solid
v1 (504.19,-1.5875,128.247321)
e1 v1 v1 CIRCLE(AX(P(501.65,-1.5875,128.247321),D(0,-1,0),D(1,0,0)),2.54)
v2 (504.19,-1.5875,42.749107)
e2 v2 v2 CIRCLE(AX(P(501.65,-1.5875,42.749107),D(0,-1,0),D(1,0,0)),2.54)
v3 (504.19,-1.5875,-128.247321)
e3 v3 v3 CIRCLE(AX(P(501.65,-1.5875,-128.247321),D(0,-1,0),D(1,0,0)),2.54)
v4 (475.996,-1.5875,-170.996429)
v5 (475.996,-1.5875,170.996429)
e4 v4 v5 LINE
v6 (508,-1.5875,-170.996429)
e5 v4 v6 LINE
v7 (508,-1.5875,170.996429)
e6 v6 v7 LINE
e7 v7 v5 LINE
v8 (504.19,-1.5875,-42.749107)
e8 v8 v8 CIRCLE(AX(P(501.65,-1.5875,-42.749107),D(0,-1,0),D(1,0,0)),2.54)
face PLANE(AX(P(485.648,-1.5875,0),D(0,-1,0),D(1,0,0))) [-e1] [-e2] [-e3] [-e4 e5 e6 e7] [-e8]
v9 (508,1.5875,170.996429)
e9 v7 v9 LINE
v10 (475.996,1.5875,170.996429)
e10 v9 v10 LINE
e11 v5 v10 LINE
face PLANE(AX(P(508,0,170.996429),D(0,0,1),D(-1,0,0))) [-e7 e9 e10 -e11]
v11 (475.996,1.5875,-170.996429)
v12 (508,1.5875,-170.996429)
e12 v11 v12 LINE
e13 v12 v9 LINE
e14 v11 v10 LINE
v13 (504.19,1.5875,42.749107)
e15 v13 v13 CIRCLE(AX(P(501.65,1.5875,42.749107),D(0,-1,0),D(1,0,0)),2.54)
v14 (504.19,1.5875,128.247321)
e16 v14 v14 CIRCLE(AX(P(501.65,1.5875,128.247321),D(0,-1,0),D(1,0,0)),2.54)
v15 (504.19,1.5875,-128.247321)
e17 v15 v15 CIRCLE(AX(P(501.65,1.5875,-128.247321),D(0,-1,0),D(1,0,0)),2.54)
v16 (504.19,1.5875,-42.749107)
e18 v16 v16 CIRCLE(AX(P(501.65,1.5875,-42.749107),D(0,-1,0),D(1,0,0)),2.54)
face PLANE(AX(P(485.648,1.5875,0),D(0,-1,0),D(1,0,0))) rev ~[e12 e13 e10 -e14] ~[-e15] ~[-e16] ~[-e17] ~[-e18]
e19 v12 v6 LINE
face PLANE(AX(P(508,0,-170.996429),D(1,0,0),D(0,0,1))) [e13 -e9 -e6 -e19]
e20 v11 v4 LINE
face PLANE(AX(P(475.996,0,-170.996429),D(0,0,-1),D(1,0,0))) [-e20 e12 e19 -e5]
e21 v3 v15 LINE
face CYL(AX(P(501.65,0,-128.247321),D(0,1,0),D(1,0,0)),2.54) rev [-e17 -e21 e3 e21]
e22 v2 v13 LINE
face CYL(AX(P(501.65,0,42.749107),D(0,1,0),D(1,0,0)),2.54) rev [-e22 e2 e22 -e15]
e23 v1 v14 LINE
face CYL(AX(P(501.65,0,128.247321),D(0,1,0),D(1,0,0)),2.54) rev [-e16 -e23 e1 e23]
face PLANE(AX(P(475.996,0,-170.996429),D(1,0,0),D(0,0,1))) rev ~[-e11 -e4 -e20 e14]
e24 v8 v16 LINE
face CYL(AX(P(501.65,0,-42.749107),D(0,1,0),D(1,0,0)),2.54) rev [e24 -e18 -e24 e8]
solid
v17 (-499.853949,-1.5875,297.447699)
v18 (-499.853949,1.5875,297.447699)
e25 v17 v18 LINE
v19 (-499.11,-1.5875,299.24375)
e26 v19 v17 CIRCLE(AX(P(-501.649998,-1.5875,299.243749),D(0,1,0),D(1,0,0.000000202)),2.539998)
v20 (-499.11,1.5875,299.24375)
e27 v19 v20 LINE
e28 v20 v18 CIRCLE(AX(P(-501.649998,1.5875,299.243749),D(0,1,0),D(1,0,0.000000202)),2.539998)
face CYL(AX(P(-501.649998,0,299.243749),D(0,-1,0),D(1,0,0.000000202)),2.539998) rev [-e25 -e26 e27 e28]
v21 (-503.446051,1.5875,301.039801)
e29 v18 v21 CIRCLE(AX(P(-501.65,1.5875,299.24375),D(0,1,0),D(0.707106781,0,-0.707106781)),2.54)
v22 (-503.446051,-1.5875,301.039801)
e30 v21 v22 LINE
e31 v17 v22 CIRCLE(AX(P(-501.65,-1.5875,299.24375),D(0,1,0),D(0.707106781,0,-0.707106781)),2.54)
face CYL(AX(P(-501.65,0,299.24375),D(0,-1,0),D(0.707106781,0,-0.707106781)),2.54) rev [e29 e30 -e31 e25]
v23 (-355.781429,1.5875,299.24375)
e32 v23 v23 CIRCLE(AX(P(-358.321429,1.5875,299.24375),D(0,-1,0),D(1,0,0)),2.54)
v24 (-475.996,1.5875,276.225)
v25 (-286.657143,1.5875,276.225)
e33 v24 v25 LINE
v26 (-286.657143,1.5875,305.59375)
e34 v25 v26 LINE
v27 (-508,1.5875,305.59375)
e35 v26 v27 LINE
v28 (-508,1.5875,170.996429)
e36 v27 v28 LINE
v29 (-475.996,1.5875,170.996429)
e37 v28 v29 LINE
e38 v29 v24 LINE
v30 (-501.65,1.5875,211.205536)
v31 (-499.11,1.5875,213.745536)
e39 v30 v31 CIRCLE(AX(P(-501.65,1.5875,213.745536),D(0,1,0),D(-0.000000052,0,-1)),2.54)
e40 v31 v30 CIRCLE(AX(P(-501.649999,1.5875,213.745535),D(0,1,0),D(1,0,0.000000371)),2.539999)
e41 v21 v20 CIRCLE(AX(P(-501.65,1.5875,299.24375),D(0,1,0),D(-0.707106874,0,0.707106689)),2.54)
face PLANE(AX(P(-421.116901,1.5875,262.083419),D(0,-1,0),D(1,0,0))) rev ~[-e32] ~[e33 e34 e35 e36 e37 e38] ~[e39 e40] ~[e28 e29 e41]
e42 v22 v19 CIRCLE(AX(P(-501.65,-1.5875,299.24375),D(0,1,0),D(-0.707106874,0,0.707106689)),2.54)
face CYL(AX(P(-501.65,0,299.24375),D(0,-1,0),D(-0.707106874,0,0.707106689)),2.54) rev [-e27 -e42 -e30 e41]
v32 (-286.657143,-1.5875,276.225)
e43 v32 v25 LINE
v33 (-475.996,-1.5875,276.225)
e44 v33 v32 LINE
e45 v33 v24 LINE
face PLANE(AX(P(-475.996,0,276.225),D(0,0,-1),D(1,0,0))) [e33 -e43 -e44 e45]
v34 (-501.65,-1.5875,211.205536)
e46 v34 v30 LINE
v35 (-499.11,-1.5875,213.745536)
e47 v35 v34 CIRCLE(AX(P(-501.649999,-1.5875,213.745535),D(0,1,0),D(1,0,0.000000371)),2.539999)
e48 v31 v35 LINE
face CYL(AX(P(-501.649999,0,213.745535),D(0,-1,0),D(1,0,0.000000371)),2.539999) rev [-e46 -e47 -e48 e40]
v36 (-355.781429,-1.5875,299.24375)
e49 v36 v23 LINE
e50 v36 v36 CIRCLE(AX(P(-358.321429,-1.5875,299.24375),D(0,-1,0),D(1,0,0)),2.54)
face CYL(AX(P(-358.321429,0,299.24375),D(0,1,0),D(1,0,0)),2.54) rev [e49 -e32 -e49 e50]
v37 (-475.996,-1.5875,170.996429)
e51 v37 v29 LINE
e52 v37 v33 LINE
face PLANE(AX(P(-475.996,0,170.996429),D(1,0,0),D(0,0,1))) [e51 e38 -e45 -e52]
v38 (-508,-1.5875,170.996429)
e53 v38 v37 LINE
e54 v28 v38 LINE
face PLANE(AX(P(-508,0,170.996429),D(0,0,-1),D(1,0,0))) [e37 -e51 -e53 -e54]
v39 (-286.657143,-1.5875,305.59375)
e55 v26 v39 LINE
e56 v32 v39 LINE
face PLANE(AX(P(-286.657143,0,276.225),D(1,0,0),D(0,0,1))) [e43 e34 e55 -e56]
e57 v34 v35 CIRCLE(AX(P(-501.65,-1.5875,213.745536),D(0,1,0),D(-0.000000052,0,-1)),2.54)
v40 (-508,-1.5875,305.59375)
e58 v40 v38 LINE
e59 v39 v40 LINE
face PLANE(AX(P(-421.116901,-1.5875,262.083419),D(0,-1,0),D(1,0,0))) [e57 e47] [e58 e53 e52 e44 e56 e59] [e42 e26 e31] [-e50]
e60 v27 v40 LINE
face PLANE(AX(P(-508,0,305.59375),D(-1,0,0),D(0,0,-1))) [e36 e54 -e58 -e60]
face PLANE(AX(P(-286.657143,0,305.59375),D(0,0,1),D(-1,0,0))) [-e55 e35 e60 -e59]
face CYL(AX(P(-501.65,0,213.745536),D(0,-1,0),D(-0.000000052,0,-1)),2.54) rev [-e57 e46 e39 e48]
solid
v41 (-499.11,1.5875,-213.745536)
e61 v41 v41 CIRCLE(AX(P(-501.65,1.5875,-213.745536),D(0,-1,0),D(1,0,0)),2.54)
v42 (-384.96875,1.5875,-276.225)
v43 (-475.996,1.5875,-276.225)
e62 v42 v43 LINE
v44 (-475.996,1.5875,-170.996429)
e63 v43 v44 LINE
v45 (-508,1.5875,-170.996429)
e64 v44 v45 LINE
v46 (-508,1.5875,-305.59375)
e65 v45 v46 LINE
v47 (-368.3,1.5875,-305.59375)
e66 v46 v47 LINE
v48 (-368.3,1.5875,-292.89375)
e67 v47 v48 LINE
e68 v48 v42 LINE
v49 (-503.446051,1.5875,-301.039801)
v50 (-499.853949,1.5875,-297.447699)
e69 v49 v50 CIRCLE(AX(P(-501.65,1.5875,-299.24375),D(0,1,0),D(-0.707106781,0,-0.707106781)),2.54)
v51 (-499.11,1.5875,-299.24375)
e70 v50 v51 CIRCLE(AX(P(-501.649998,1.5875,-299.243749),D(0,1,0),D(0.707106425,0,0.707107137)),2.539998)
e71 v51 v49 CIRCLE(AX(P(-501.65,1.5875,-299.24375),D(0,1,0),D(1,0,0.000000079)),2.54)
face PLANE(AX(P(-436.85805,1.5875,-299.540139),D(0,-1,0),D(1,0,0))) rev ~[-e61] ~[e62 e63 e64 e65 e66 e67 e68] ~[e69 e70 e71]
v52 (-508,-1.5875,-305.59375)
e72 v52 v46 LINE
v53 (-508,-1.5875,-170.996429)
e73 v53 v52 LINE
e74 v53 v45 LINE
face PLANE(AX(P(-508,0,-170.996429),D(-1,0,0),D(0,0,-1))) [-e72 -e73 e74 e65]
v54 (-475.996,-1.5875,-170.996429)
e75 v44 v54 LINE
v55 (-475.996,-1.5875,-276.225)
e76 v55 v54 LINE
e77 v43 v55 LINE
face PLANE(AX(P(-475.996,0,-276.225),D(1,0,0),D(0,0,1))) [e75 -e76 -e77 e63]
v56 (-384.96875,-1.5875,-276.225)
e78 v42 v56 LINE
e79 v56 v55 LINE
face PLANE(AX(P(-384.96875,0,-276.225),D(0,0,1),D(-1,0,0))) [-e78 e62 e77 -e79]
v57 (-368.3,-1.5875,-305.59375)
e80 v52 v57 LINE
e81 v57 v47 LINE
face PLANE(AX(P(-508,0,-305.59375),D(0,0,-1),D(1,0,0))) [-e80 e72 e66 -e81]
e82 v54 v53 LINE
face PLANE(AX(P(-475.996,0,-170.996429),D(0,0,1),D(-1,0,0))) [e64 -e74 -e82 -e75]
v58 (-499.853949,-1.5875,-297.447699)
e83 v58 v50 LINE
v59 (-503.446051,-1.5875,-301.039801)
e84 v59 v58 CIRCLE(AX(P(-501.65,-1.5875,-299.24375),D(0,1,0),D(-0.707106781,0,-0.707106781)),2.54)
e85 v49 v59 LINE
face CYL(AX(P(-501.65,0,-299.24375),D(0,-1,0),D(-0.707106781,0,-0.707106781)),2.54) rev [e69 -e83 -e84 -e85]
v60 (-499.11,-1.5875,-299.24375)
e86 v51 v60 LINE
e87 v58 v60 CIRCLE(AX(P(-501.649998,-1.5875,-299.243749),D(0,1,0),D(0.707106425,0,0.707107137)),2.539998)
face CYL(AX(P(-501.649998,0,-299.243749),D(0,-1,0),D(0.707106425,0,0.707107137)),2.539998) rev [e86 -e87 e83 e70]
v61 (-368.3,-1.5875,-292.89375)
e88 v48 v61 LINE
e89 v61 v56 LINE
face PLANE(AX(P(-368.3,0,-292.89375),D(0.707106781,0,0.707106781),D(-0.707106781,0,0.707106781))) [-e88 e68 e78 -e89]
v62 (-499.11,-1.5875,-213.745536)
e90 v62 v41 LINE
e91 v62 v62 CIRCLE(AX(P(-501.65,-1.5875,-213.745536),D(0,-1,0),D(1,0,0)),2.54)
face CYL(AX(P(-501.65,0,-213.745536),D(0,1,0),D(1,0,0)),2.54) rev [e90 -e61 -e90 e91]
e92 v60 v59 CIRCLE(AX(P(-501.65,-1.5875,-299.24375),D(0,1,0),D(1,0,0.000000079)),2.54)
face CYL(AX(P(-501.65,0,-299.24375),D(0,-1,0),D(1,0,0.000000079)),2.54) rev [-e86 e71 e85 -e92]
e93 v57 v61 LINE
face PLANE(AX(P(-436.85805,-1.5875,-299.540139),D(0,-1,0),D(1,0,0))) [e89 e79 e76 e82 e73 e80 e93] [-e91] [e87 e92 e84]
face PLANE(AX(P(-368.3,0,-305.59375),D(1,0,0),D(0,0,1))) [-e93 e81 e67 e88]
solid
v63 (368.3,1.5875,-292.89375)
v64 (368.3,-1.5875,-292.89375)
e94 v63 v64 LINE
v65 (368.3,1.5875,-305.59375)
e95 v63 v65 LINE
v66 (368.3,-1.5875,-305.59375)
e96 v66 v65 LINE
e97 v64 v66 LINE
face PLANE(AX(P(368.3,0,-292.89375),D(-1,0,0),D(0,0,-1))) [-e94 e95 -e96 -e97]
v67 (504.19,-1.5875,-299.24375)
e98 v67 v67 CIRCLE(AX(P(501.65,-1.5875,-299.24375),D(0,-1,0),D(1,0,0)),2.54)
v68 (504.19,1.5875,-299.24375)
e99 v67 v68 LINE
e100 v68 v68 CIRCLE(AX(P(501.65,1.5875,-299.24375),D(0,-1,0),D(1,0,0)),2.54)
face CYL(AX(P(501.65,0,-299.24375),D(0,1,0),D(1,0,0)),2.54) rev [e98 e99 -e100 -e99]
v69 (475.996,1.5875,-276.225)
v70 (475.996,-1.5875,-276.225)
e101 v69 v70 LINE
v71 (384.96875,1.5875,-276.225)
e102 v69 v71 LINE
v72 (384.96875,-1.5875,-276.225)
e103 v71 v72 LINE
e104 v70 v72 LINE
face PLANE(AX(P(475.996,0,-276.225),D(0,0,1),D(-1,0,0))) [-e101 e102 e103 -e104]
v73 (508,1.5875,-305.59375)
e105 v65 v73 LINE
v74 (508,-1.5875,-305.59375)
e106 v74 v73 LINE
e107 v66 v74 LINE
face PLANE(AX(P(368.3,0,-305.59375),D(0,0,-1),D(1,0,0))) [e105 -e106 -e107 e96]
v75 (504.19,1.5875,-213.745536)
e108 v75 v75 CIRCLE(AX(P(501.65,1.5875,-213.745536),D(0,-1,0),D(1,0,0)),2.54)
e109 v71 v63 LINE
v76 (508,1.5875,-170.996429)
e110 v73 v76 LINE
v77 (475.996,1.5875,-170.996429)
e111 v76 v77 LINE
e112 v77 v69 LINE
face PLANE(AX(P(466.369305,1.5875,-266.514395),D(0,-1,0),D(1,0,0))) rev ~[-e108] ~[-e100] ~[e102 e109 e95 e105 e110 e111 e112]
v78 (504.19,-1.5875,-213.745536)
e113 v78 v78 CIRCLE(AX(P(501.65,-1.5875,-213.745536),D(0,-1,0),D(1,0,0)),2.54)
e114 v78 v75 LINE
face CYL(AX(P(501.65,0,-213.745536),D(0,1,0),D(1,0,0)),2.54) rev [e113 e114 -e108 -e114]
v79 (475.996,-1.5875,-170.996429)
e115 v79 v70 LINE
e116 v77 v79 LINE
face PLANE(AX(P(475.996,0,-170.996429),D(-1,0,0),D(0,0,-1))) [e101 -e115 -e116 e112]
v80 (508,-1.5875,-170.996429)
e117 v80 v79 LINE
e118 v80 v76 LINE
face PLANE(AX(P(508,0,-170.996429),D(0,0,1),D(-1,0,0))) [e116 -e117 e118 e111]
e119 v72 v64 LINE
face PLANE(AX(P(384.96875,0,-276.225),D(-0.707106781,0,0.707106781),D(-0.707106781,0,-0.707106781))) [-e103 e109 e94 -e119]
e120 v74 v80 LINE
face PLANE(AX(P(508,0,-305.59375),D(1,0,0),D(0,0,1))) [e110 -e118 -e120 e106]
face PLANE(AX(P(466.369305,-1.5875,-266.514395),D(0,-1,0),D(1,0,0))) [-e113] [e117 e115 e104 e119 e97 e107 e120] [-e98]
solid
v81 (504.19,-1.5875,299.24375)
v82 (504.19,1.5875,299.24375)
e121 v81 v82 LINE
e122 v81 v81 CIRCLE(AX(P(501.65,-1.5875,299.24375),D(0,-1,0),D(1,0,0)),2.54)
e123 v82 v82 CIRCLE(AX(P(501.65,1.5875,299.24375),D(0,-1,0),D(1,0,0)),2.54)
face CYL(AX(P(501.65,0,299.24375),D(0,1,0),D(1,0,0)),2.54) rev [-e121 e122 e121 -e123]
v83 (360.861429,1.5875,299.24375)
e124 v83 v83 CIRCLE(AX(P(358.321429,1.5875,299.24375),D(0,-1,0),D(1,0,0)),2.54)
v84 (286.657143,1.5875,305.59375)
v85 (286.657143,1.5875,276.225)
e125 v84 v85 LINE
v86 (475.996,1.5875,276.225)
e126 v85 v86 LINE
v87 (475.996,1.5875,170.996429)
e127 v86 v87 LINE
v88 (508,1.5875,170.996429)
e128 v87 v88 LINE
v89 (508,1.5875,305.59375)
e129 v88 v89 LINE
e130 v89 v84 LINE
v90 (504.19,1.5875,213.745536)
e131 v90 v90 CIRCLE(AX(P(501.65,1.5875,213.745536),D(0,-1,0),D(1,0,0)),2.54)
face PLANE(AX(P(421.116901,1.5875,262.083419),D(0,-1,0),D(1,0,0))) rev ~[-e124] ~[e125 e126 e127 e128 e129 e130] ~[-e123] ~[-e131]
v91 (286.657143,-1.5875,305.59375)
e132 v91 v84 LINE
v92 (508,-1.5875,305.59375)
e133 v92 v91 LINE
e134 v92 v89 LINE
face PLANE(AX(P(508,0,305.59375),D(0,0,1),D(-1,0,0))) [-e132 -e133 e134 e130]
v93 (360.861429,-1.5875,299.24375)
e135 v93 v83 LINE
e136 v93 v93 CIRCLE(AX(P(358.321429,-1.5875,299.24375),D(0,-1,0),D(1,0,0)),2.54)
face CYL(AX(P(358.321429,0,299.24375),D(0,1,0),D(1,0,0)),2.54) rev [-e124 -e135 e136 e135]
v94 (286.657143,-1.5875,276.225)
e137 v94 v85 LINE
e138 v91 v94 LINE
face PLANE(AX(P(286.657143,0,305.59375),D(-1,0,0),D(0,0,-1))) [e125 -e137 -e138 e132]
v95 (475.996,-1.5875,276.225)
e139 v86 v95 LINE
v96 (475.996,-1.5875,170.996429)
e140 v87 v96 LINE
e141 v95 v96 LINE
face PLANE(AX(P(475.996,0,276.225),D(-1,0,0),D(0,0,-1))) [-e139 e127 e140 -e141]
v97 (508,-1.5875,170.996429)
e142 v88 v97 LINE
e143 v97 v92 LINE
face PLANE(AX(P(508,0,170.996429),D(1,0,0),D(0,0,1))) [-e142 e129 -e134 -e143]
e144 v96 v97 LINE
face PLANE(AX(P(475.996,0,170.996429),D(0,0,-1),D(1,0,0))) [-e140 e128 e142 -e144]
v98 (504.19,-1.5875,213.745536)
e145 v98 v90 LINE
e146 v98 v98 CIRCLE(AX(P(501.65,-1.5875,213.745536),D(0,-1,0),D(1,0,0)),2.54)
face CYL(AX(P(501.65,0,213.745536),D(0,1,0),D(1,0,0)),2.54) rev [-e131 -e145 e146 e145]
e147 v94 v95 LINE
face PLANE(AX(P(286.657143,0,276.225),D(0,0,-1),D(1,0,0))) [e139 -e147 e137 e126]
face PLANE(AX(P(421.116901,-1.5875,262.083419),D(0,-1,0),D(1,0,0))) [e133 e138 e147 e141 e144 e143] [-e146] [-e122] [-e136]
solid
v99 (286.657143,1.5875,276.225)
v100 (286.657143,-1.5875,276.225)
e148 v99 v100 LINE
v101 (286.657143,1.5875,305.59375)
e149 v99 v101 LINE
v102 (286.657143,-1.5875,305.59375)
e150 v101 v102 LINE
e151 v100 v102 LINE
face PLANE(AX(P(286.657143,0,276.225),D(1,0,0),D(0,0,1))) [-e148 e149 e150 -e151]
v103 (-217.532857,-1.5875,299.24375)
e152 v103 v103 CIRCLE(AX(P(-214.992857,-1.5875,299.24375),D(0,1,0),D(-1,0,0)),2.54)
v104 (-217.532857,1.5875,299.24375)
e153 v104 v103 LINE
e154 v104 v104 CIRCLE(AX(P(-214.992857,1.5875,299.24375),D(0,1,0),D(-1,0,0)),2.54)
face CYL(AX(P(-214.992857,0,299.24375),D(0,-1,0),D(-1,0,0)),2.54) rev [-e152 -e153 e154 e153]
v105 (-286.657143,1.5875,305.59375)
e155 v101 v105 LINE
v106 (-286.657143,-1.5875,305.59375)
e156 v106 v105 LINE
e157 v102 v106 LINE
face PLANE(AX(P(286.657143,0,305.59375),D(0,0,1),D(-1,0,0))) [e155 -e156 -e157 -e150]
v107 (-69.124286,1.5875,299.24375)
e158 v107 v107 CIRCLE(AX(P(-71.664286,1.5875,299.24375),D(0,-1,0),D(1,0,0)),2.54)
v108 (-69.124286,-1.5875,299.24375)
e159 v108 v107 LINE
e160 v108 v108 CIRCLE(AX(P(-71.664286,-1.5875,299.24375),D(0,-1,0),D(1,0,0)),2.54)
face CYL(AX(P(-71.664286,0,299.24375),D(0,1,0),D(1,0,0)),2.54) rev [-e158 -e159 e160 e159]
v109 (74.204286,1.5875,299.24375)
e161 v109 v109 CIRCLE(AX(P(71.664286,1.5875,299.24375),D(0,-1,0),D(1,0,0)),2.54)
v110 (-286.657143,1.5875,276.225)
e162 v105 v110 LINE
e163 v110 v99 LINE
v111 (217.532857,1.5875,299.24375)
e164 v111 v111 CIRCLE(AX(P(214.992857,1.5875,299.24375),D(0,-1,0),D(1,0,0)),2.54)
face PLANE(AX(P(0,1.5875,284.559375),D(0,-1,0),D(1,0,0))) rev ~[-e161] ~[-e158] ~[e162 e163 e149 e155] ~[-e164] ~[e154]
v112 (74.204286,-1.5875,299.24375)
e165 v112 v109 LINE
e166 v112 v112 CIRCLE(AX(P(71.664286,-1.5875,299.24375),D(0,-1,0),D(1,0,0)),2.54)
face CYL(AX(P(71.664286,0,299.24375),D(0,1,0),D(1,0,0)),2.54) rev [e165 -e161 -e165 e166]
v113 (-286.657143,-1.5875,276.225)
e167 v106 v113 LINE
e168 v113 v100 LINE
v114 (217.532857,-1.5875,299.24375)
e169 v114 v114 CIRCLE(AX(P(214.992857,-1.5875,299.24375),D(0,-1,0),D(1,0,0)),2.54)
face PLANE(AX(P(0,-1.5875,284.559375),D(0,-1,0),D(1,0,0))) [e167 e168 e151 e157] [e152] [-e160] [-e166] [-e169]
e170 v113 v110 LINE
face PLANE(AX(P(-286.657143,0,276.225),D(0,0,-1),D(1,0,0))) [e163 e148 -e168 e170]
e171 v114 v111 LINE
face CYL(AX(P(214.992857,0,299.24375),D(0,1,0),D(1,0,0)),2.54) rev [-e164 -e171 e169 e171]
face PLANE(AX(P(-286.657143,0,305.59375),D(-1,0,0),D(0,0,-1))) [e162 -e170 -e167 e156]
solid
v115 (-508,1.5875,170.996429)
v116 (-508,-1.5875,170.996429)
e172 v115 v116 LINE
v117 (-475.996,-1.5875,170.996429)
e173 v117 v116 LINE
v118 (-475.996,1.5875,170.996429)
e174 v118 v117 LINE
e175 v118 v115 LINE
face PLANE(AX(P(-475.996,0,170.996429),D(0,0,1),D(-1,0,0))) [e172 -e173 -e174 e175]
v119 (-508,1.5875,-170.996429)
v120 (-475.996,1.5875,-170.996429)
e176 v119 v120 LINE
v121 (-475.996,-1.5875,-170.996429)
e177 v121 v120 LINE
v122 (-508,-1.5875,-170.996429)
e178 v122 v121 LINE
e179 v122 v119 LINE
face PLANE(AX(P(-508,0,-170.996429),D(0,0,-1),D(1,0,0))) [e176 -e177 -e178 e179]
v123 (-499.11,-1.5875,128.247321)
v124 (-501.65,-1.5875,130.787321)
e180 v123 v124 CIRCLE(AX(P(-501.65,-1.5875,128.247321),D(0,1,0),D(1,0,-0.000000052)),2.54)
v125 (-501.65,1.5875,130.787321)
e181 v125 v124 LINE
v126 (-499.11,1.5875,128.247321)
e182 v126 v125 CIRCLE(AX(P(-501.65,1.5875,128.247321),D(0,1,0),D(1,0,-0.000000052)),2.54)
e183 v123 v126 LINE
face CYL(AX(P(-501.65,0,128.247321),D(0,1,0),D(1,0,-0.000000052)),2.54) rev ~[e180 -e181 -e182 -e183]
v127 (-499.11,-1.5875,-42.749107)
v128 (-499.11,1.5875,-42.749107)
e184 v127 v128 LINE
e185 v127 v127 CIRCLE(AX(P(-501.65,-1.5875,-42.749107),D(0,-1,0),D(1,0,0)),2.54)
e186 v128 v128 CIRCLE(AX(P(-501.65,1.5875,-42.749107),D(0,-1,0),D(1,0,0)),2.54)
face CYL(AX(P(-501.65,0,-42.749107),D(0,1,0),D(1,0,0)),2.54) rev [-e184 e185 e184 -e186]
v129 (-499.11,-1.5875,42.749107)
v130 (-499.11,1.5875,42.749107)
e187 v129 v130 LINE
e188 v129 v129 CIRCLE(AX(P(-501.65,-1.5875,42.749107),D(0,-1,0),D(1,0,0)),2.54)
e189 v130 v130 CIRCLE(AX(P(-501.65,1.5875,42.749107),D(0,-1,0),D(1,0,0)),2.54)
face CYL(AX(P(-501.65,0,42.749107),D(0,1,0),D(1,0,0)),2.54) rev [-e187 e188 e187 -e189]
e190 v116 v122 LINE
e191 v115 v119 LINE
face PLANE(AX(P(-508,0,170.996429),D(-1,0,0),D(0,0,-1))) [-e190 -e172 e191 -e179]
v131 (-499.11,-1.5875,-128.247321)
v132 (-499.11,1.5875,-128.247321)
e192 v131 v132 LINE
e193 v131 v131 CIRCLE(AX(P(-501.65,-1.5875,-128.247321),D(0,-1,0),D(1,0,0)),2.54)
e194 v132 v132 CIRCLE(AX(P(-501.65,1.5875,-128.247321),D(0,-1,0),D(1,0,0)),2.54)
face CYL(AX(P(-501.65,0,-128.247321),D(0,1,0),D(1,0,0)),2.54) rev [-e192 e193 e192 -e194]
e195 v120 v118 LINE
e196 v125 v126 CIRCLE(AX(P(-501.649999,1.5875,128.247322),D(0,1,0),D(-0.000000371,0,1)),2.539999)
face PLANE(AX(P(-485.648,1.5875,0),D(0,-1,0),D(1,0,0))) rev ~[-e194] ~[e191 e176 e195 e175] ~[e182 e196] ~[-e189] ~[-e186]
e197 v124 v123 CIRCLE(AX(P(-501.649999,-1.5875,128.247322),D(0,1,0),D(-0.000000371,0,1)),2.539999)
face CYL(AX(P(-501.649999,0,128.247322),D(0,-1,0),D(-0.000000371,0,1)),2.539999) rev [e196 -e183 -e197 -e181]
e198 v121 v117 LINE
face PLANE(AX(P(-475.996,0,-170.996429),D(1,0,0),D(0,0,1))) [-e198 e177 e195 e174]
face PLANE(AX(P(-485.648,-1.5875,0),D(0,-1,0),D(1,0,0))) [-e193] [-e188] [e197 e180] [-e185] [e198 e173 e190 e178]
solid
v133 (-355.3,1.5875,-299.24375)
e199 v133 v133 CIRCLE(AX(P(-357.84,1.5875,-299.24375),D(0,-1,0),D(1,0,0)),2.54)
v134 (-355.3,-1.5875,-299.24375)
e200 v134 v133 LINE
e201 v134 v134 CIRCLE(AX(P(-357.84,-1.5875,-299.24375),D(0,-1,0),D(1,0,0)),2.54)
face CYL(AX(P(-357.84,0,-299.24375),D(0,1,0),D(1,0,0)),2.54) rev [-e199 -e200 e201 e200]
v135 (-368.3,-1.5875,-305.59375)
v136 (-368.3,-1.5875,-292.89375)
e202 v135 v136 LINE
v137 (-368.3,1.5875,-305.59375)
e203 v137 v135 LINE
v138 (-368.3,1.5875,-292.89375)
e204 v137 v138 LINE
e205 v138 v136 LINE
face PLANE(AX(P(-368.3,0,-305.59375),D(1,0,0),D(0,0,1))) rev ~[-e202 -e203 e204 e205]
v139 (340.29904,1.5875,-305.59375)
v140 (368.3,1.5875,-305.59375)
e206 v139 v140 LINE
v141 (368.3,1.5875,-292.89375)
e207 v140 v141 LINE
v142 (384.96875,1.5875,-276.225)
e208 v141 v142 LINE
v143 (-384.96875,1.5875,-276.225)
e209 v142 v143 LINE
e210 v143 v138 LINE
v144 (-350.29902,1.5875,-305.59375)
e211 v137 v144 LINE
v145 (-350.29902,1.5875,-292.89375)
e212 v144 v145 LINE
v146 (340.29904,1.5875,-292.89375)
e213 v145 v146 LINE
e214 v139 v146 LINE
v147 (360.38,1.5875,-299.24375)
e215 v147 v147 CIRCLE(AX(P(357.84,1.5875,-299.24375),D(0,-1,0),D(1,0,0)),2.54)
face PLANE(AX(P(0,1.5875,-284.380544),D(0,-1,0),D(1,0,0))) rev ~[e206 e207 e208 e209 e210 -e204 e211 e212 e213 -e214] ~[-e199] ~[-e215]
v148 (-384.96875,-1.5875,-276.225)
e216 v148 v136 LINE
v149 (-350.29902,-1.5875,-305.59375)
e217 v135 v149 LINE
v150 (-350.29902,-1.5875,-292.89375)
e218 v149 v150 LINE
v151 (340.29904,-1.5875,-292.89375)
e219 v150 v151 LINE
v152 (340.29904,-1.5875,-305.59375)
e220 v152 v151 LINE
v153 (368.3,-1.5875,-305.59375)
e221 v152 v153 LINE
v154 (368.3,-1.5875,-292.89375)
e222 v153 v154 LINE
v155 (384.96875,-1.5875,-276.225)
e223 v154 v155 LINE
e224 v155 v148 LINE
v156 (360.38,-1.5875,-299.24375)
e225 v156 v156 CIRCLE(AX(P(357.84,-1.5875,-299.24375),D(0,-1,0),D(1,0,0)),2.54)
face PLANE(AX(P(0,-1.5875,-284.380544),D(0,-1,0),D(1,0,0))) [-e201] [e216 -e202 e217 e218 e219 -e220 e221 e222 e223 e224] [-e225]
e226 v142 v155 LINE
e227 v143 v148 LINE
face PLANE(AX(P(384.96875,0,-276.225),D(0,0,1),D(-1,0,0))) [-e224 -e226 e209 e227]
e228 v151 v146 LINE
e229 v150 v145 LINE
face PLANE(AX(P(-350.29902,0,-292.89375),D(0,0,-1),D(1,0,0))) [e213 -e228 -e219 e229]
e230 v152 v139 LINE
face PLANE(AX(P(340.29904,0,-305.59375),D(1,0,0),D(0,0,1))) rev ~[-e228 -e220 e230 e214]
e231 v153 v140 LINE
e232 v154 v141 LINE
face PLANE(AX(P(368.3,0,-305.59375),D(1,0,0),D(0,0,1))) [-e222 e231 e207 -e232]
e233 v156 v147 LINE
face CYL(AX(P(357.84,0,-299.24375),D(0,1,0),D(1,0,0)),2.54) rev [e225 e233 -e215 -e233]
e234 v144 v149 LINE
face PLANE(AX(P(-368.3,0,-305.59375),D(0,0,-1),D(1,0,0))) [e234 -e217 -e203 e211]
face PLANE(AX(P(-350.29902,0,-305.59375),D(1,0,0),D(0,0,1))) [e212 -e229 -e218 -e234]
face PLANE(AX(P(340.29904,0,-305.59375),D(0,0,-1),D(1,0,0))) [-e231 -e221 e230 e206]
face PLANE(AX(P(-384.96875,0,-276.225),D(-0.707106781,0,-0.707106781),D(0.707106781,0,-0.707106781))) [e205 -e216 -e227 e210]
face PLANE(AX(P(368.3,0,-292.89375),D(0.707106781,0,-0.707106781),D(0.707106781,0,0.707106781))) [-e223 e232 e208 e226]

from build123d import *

# Parameters (mm, degrees)
F0_R     = 2.54
F1_DEPTH = 1.5875
F0_W     = 573.314286
F0_H     = 16.66875
F2_DEPTH = 1.5875
F3_DEPTH = 1.5875
F0_W_2   = 19.304
F0_H_2   = 341.992858
F0_W_3   = 12.7
F4_DEPTH = 1.5875
F5_DEPTH = 1.5875
F0_W_4   = 28.00096
F0_H_3   = 12.7
F0_W_5   = 18.00098
F6_DEPTH = 1.5875
F7_DEPTH = 1.5875
F8_DEPTH = 1.5875


# Not quite as in the source:
# - a feature names something its author has since deleted; it is built from what else it names


with BuildPart() as f1:
    # F0 (on Front) → F1 (new body, symmetric)
    with BuildSketch(Plane.XZ):
        Polygon((-286.657143, 276.225), (-286.657143, 292.89375), (-495.3, 292.89375), (-495.3, 170.996429), (-475.996, 170.996429), (-475.996, 276.225), align=None)
        with BuildLine():
            Line((-495.3, 170.996429), (-495.3, 292.89375))
            Line((-495.3, 292.89375), (-499.853949, 297.447699))
            ThreePointArc((-499.853949, 297.447699), (-503.446051, 297.447699), (-503.446051, 301.039801))
            Line((-503.446051, 301.039801), (-508, 305.59375))
            Line((-508, 305.59375), (-508, 170.996429))
            Line((-508, 170.996429), (-501.65, 170.996429))
            Line((-501.65, 170.996429), (-495.3, 170.996429))
        make_face()
        with BuildLine():
            ThreePointArc((-499.11, 213.745536), (-499.853949, 211.949484), (-501.65, 211.205536))
            ThreePointArc((-501.65, 211.205536), (-503.446051, 215.541587), (-499.11, 213.745536))
        make_face(mode=Mode.SUBTRACT)
        with BuildLine():
            Line((-495.3, 292.89375), (-286.657143, 292.89375))
            Line((-286.657143, 292.89375), (-286.657143, 299.24375))
            Line((-286.657143, 299.24375), (-286.657143, 305.59375))
            Line((-286.657143, 305.59375), (-508, 305.59375))
            Line((-508, 305.59375), (-503.446051, 301.039801))
            ThreePointArc((-503.446051, 301.039801), (-500.677984, 301.590404), (-499.11, 299.24375))
            ThreePointArc((-499.11, 299.24375), (-499.303346, 298.271734), (-499.853949, 297.447699))
            Line((-499.853949, 297.447699), (-495.3, 292.89375))
        make_face()
        with Locations((-358.321429, 299.24375)):
            Circle(F0_R, mode=Mode.SUBTRACT)
    extrude(amount=F1_DEPTH, both=True)


with BuildPart() as f2:
    # F0 (on Front) → F2 (new body, symmetric)
    with BuildSketch(Plane.XZ):
        with Locations((0, 284.559375)):
            Rectangle(F0_W, F0_H)
        Polygon((-286.657143, 292.89375), (286.657143, 292.89375), (286.657143, 305.59375), (-286.657143, 305.59375), (-286.657143, 299.24375), align=None)
        with BuildLine():
            ThreePointArc((-212.452857, 299.24375), (-214.992857, 296.70375), (-217.532857, 299.24375))
            ThreePointArc((-217.532857, 299.24375), (-214.992857, 301.78375), (-212.452857, 299.24375))
        make_face(mode=Mode.SUBTRACT)
        with Locations((-71.664286, 299.24375)):
            Circle(F0_R, mode=Mode.SUBTRACT)
        with Locations((71.664286, 299.24375)):
            Circle(F0_R, mode=Mode.SUBTRACT)
        with Locations((214.992857, 299.24375)):
            Circle(F0_R, mode=Mode.SUBTRACT)
    extrude(amount=F2_DEPTH, both=True)


with BuildPart() as f3:
    # F0 (on Front) → F3 (new body, symmetric)
    with BuildSketch(Plane.XZ):
        Polygon((495.3, 170.996429), (495.3, 292.89375), (286.657143, 292.89375), (286.657143, 276.225), (475.996, 276.225), (475.996, 170.996429), align=None)
        Polygon((286.657143, 292.89375), (495.3, 292.89375), (495.3, 170.996429), (508, 170.996429), (508, 305.59375), (286.657143, 305.59375), align=None)
        with Locations((501.65, 213.745536)):
            Circle(F0_R, mode=Mode.SUBTRACT)
        with Locations((358.321429, 299.24375)):
            Circle(F0_R, mode=Mode.SUBTRACT)
        with Locations((501.65, 299.24375)):
            Circle(F0_R, mode=Mode.SUBTRACT)
    extrude(amount=F3_DEPTH, both=True)


with BuildPart() as f4:
    # F0 (on Front) → F4 (new body, symmetric)
    with BuildSketch(Plane.XZ):
        with Locations((485.648, 0)):
            Rectangle(F0_W_2, F0_H_2)
        with Locations((501.65, 0)):
            Rectangle(F0_W_3, F0_H_2)
        with Locations((501.65, -128.247321)):
            Circle(F0_R, mode=Mode.SUBTRACT)
        with Locations((501.65, -42.749107)):
            Circle(F0_R, mode=Mode.SUBTRACT)
        with Locations((501.65, 42.749107)):
            Circle(F0_R, mode=Mode.SUBTRACT)
        with Locations((501.65, 128.247321)):
            Circle(F0_R, mode=Mode.SUBTRACT)
    extrude(amount=F4_DEPTH, both=True)


with BuildPart() as f5:
    # F0 (on Front) → F5 (new body, symmetric)
    with BuildSketch(Plane.XZ):
        Polygon((508, -170.996429), (495.3, -170.996429), (495.3, -292.89375), (368.3, -292.89375), (368.3, -305.59375), (508, -305.59375), align=None)
        with Locations((501.65, -299.24375)):
            Circle(F0_R, mode=Mode.SUBTRACT)
        with Locations((501.65, -213.745536)):
            Circle(F0_R, mode=Mode.SUBTRACT)
        Polygon((495.3, -292.89375), (495.3, -170.996429), (475.996, -170.996429), (475.996, -276.225), (384.96875, -276.225), (368.3, -292.89375), align=None)
    extrude(amount=F5_DEPTH, both=True)


with BuildPart() as f6:
    # F0 (on Front) → F6 (new body, symmetric)
    with BuildSketch(Plane.XZ):
        Polygon((340.29904, -292.89375), (368.3, -292.89375), (384.96875, -276.225), (-384.96875, -276.225), (-368.3, -292.89375), (-350.29902, -292.89375), align=None)
        with Locations((354.29952, -299.24375)):
            Rectangle(F0_W_4, F0_H_3)
        with Locations((357.84, -299.24375)):
            Circle(F0_R, mode=Mode.SUBTRACT)
        with Locations((-359.29951, -299.24375)):
            Rectangle(F0_W_5, F0_H_3)
        with Locations((-357.84, -299.24375)):
            Circle(F0_R, mode=Mode.SUBTRACT)
    extrude(amount=F6_DEPTH, both=True)


with BuildPart() as f7:
    # F0 (on Front) → F7 (new body, symmetric)
    with BuildSketch(Plane.XZ):
        with BuildLine():
            Line((-368.3, -292.89375), (-495.3, -292.89375))
            Line((-495.3, -292.89375), (-499.853949, -297.447699))
            ThreePointArc((-499.853949, -297.447699), (-499.303346, -298.271734), (-499.11, -299.24375))
            ThreePointArc((-499.11, -299.24375), (-500.677984, -301.590404), (-503.446051, -301.039801))
            Line((-503.446051, -301.039801), (-508, -305.59375))
            Line((-508, -305.59375), (-368.3, -305.59375))
            Line((-368.3, -305.59375), (-368.3, -292.89375))
        make_face()
        with BuildLine():
            Line((-495.3, -292.89375), (-495.3, -170.996429))
            Line((-495.3, -170.996429), (-508, -170.996429))
            Line((-508, -170.996429), (-508, -305.59375))
            Line((-508, -305.59375), (-503.446051, -301.039801))
            ThreePointArc((-503.446051, -301.039801), (-503.446051, -297.447699), (-499.853949, -297.447699))
            Line((-499.853949, -297.447699), (-495.3, -292.89375))
        make_face()
        with Locations((-501.65, -213.745536)):
            Circle(F0_R, mode=Mode.SUBTRACT)
        Polygon((-475.996, -170.996429), (-495.3, -170.996429), (-495.3, -292.89375), (-368.3, -292.89375), (-384.96875, -276.225), (-475.996, -276.225), align=None)
    extrude(amount=F7_DEPTH, both=True)


with BuildPart() as f8:
    # F0 (on Front) → F8 (new body, symmetric)
    with BuildSketch(Plane.XZ):
        with Locations((-485.648, 0)):
            Rectangle(F0_W_2, F0_H_2)
        Polygon((-495.3, -170.996429), (-495.3, 170.996429), (-501.65, 170.996429), (-508, 170.996429), (-508, -170.996429), align=None)
        with Locations((-501.65, -128.247321)):
            Circle(F0_R, mode=Mode.SUBTRACT)
        with Locations((-501.65, -42.749107)):
            Circle(F0_R, mode=Mode.SUBTRACT)
        with Locations((-501.65, 42.749107)):
            Circle(F0_R, mode=Mode.SUBTRACT)
        with BuildLine():
            ThreePointArc((-499.11, 128.247321), (-503.446051, 126.45127), (-501.65, 130.787321))
            ThreePointArc((-501.65, 130.787321), (-499.853949, 130.043373), (-499.11, 128.247321))
        make_face(mode=Mode.SUBTRACT)
    extrude(amount=F8_DEPTH, both=True)


solid = Compound([f1.part, f2.part, f3.part, f4.part, f5.part, f6.part, f7.part, f8.part])
